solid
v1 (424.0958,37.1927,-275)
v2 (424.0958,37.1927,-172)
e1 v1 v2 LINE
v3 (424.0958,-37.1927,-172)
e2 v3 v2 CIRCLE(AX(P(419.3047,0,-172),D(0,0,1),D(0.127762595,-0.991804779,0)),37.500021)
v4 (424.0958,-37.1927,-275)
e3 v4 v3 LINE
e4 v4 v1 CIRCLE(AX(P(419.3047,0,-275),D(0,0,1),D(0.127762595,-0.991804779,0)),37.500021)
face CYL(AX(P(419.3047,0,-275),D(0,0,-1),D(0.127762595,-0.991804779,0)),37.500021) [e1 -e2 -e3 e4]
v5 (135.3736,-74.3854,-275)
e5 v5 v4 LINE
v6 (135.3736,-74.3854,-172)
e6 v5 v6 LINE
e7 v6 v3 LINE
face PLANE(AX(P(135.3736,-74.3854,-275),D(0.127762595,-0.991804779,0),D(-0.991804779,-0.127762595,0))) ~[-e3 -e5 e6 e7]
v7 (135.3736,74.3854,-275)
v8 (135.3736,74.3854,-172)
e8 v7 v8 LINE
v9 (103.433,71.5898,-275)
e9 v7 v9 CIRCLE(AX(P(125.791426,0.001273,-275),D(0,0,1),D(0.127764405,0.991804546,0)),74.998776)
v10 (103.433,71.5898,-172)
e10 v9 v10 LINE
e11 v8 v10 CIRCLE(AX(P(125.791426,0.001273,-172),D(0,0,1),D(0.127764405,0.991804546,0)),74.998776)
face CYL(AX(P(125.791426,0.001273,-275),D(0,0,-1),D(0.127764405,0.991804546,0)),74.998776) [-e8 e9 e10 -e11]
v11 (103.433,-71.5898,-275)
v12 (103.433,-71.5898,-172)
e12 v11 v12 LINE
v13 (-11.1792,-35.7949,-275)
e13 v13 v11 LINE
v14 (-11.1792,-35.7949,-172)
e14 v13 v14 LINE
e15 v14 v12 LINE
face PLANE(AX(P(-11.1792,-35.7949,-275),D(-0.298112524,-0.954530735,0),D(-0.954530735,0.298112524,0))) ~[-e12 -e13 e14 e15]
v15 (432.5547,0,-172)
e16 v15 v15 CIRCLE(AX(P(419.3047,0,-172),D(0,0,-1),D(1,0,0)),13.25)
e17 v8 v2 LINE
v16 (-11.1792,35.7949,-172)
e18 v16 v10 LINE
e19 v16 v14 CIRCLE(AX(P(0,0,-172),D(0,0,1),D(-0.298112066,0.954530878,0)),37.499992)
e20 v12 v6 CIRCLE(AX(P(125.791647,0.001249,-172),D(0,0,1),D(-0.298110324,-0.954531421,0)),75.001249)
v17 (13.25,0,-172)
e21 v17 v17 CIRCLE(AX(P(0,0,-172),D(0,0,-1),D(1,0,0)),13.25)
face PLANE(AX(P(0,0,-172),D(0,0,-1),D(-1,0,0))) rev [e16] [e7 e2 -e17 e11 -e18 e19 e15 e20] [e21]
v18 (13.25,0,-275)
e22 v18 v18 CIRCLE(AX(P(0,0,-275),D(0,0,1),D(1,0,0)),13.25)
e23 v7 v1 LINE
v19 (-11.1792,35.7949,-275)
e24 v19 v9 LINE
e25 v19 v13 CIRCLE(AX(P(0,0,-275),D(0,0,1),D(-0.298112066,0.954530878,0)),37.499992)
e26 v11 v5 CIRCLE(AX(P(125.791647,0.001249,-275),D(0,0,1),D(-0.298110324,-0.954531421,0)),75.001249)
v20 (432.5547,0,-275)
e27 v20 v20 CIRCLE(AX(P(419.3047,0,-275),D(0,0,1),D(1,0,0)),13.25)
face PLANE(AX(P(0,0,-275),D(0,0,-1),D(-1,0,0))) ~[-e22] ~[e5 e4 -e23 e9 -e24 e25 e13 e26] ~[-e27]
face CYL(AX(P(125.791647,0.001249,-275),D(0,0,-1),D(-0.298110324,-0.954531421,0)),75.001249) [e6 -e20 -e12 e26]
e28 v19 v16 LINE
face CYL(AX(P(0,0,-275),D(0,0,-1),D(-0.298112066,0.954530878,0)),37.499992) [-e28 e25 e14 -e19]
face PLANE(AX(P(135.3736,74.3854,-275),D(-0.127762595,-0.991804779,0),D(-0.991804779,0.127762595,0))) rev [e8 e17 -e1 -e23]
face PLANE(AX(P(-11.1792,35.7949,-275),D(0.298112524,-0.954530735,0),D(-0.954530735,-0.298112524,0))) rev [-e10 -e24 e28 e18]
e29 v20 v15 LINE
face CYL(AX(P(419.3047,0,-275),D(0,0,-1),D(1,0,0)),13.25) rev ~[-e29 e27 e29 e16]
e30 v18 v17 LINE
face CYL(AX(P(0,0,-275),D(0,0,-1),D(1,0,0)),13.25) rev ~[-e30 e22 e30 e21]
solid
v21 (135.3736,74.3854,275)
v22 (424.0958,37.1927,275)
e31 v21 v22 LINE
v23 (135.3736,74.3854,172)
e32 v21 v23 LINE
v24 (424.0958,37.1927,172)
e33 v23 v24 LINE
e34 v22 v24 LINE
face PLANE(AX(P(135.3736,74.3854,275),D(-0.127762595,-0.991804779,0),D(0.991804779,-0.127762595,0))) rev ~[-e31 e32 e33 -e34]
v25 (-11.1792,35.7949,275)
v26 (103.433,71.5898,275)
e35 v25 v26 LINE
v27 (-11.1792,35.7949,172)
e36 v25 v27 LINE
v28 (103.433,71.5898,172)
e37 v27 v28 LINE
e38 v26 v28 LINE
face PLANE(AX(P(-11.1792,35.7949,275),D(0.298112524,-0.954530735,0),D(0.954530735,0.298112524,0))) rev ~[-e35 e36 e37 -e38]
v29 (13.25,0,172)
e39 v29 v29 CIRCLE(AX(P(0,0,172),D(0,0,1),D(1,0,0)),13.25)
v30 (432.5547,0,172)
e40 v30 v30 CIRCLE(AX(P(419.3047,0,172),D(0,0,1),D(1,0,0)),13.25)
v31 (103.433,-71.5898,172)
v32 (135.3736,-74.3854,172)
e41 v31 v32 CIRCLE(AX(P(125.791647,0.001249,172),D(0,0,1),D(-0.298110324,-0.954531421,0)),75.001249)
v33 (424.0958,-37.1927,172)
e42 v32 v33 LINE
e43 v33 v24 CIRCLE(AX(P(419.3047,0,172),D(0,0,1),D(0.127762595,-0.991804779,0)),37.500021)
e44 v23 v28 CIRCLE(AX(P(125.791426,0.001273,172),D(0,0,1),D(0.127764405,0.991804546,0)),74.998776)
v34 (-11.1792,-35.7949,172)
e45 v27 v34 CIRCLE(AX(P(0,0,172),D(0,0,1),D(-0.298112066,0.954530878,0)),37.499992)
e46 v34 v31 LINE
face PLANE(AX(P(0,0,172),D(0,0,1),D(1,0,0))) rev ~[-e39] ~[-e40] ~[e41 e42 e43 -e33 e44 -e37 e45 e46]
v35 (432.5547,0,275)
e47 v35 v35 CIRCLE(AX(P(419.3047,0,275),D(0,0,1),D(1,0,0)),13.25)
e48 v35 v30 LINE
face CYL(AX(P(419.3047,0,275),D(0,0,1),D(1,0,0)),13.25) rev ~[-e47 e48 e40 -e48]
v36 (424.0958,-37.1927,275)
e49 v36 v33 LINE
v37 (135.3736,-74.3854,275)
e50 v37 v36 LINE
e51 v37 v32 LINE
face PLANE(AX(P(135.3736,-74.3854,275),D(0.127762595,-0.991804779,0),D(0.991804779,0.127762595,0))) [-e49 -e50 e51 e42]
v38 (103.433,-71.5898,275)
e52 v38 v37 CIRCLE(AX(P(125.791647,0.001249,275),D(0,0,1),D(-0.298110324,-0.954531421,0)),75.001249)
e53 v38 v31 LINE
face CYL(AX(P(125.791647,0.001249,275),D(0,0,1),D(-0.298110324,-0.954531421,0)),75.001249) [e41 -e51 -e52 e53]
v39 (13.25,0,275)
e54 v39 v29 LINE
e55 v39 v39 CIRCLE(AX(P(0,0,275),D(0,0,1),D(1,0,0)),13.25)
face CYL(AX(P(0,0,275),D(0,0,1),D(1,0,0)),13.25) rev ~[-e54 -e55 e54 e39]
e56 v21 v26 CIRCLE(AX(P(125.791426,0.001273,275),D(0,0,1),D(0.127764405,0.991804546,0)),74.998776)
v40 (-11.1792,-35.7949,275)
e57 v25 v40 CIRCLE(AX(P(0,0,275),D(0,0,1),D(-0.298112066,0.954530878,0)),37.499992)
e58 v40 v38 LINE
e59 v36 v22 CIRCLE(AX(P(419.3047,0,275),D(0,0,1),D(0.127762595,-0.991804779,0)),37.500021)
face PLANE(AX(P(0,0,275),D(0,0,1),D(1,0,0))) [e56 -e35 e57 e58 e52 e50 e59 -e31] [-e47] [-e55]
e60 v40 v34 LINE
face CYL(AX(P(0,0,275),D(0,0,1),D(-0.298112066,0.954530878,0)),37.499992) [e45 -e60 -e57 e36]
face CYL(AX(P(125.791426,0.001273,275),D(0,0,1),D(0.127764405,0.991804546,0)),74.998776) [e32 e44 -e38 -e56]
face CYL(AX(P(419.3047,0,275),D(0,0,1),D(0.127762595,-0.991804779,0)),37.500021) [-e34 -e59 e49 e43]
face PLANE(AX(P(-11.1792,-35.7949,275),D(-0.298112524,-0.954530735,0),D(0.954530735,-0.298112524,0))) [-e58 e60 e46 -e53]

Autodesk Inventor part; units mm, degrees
ref_plane "YZ Plane" through (0, 0, 0) normal (1, 0, 0) x (0, 1, 0)
ref_plane "XZ Plane" through (0, 0, 0) normal (0, 1, 0) x (-1, 0, 0)
ref_plane "工作平面1" through (0, 0, 275) normal (0, 0, 1) x (1, 0, 0)
sketch "草圖1" plane through (0, 0, 275) normal (0, 0, 1) x (1, 0, 0)
  line L0 (0, 0) -> (419.3047, 0) construction
  arc A0 (-11.1792, 35.7949) -> (-11.1792, -35.7949) centre (0, 0) ccw
  arc A1 (424.0958, -37.1927) -> (424.0958, 37.1927) centre (419.3047, 0) ccw
  line L1 (-11.1792, -35.7949) -> (103.433, -71.5898)
  line L2 (135.3736, 74.3854) -> (424.0958, 37.1927)
  line L3 (-11.1792, 35.7949) -> (103.433, 71.5898)
  line L4 (135.3736, -74.3854) -> (424.0958, -37.1927)
  arc A2 (103.433, -71.5898) -> (135.3736, -74.3854) centre (125.7914, 0) ccw
  arc A3 (135.3736, 74.3854) -> (103.433, 71.5898) centre (125.7914, 0) ccw
  dimension "d3" = 419.3047
  dimension "d4" = 75
  dimension "d6" = 75
  dimension "d51" = 125.7914
  dimension "d52" = 75
extrude "擠出1" add sketch "草圖1" against normal blind 103
sketch "草圖2" plane through (0, 0, 275) normal (0, 0, 1) x (1, 0, 0)
  arc A0 (-11.1792, 35.7949) -> (-11.1792, -35.7949) centre (0, 0) ccw projected
  circle A1 centre (0, 0) radius 13.25
  arc A2 (424.0958, -37.1927) -> (424.0958, 37.1927) centre (419.3047, 0) ccw projected
  circle A3 centre (419.3047, 0) radius 13.25
  point P0 (-10.9663, -35.8607)
  point P1 (-34.5251, 14.6378)
  point P2 (141.4214, 141.4214)
  point P3 (444.0649, 33.6154)
  point P4 (432.144, -37.2043)
  dimension "d11" = 26.5
  dimension "d13" = 26.5
extrude "擠出2" cut sketch "草圖2" against normal through all
sketch "草圖3" plane through (434.4748, 35.8557, 275) normal (0.1277625, 0.9918048, 0) x (0.9918048, -0.1277625, 0)
  line L0 (-10.4648, 0) -> (-10.4648, 103) projected
  point P0 (-426.3332, 275)
  point P1 (-10.4648, 51.5)
  point P2 (-10.4648, 51.5)
hole "孔1" [suppressed]
sketch "草圖4" plane through (51.2031, 55.2777, 275) normal (-0.2981126, 0.9545307, 0) x (0.9545307, 0.2981126, 0)
  line L0 (-65.3539, 0) -> (-65.3539, 103) projected
  point P0 (-65.3539, 275)
  point P1 (-65.3539, 51.5)
  point P2 (-65.3539, 51.5)
hole "孔2" [suppressed]
sketch "草圖6" plane through (-11.1792, -35.7949, 172) normal (-0.2981126, -0.9545307, 0) x (0.9545307, -0.2981126, 0)
  line L0 (0, 51.5) -> (0, 0) projected
  point P0 (0, -172)
  point P1 (0, 25.75)
hole "孔4" [suppressed]
sketch "草圖7" plane through (135.3736, -74.3854, 172) normal (0.1277625, -0.9918048, 0) x (0.9918048, 0.1277625, 0)
  line L0 (296.8516, 51.5) -> (296.8516, 0) projected
  point P0 (-124.7605, -172)
  point P1 (296.8516, 25.75)
hole "孔5" [suppressed]
mirror "鏡射1" about plane through (0, 0, 0) normal (0, 0, 1) of "擠出1", "擠出2"
equation "\"d3\" = R5"
equation "\"d51\" = 0.3 * R5"
equation "\"R5\" = T1A_R5"
equation "\"th5a\" = T1A_th5a"
equation "\"d0\" = 0.5 * Width"
equation "\"T1A_R5\" = 419.3047"
equation "\"T1A_th5a\" = 45deg"
equation "\"T1A_R1\" = 585.5331"
equation "\"T1A_R3\" = 252.3048"
equation "\"T1A_R4\" = 320.6953"
equation "\"T1A_R7\" = -221.7475"
equation "\"T1A_R8\" = 369.2781"
equation "\"T1A_R1_Width\" = 756"
equation "\"T1A_R2_Width\" = 756"
equation "\"T1A_R3_Width\" = 344"
equation "\"T1A_R4_Width\" = 756"
equation "\"T1A_Joint_Width\" = 756"
equation "\"Width\" = 550"
properties part number "Type 1A R5主滑台連接桿:1" material "密度7850的鋼"
